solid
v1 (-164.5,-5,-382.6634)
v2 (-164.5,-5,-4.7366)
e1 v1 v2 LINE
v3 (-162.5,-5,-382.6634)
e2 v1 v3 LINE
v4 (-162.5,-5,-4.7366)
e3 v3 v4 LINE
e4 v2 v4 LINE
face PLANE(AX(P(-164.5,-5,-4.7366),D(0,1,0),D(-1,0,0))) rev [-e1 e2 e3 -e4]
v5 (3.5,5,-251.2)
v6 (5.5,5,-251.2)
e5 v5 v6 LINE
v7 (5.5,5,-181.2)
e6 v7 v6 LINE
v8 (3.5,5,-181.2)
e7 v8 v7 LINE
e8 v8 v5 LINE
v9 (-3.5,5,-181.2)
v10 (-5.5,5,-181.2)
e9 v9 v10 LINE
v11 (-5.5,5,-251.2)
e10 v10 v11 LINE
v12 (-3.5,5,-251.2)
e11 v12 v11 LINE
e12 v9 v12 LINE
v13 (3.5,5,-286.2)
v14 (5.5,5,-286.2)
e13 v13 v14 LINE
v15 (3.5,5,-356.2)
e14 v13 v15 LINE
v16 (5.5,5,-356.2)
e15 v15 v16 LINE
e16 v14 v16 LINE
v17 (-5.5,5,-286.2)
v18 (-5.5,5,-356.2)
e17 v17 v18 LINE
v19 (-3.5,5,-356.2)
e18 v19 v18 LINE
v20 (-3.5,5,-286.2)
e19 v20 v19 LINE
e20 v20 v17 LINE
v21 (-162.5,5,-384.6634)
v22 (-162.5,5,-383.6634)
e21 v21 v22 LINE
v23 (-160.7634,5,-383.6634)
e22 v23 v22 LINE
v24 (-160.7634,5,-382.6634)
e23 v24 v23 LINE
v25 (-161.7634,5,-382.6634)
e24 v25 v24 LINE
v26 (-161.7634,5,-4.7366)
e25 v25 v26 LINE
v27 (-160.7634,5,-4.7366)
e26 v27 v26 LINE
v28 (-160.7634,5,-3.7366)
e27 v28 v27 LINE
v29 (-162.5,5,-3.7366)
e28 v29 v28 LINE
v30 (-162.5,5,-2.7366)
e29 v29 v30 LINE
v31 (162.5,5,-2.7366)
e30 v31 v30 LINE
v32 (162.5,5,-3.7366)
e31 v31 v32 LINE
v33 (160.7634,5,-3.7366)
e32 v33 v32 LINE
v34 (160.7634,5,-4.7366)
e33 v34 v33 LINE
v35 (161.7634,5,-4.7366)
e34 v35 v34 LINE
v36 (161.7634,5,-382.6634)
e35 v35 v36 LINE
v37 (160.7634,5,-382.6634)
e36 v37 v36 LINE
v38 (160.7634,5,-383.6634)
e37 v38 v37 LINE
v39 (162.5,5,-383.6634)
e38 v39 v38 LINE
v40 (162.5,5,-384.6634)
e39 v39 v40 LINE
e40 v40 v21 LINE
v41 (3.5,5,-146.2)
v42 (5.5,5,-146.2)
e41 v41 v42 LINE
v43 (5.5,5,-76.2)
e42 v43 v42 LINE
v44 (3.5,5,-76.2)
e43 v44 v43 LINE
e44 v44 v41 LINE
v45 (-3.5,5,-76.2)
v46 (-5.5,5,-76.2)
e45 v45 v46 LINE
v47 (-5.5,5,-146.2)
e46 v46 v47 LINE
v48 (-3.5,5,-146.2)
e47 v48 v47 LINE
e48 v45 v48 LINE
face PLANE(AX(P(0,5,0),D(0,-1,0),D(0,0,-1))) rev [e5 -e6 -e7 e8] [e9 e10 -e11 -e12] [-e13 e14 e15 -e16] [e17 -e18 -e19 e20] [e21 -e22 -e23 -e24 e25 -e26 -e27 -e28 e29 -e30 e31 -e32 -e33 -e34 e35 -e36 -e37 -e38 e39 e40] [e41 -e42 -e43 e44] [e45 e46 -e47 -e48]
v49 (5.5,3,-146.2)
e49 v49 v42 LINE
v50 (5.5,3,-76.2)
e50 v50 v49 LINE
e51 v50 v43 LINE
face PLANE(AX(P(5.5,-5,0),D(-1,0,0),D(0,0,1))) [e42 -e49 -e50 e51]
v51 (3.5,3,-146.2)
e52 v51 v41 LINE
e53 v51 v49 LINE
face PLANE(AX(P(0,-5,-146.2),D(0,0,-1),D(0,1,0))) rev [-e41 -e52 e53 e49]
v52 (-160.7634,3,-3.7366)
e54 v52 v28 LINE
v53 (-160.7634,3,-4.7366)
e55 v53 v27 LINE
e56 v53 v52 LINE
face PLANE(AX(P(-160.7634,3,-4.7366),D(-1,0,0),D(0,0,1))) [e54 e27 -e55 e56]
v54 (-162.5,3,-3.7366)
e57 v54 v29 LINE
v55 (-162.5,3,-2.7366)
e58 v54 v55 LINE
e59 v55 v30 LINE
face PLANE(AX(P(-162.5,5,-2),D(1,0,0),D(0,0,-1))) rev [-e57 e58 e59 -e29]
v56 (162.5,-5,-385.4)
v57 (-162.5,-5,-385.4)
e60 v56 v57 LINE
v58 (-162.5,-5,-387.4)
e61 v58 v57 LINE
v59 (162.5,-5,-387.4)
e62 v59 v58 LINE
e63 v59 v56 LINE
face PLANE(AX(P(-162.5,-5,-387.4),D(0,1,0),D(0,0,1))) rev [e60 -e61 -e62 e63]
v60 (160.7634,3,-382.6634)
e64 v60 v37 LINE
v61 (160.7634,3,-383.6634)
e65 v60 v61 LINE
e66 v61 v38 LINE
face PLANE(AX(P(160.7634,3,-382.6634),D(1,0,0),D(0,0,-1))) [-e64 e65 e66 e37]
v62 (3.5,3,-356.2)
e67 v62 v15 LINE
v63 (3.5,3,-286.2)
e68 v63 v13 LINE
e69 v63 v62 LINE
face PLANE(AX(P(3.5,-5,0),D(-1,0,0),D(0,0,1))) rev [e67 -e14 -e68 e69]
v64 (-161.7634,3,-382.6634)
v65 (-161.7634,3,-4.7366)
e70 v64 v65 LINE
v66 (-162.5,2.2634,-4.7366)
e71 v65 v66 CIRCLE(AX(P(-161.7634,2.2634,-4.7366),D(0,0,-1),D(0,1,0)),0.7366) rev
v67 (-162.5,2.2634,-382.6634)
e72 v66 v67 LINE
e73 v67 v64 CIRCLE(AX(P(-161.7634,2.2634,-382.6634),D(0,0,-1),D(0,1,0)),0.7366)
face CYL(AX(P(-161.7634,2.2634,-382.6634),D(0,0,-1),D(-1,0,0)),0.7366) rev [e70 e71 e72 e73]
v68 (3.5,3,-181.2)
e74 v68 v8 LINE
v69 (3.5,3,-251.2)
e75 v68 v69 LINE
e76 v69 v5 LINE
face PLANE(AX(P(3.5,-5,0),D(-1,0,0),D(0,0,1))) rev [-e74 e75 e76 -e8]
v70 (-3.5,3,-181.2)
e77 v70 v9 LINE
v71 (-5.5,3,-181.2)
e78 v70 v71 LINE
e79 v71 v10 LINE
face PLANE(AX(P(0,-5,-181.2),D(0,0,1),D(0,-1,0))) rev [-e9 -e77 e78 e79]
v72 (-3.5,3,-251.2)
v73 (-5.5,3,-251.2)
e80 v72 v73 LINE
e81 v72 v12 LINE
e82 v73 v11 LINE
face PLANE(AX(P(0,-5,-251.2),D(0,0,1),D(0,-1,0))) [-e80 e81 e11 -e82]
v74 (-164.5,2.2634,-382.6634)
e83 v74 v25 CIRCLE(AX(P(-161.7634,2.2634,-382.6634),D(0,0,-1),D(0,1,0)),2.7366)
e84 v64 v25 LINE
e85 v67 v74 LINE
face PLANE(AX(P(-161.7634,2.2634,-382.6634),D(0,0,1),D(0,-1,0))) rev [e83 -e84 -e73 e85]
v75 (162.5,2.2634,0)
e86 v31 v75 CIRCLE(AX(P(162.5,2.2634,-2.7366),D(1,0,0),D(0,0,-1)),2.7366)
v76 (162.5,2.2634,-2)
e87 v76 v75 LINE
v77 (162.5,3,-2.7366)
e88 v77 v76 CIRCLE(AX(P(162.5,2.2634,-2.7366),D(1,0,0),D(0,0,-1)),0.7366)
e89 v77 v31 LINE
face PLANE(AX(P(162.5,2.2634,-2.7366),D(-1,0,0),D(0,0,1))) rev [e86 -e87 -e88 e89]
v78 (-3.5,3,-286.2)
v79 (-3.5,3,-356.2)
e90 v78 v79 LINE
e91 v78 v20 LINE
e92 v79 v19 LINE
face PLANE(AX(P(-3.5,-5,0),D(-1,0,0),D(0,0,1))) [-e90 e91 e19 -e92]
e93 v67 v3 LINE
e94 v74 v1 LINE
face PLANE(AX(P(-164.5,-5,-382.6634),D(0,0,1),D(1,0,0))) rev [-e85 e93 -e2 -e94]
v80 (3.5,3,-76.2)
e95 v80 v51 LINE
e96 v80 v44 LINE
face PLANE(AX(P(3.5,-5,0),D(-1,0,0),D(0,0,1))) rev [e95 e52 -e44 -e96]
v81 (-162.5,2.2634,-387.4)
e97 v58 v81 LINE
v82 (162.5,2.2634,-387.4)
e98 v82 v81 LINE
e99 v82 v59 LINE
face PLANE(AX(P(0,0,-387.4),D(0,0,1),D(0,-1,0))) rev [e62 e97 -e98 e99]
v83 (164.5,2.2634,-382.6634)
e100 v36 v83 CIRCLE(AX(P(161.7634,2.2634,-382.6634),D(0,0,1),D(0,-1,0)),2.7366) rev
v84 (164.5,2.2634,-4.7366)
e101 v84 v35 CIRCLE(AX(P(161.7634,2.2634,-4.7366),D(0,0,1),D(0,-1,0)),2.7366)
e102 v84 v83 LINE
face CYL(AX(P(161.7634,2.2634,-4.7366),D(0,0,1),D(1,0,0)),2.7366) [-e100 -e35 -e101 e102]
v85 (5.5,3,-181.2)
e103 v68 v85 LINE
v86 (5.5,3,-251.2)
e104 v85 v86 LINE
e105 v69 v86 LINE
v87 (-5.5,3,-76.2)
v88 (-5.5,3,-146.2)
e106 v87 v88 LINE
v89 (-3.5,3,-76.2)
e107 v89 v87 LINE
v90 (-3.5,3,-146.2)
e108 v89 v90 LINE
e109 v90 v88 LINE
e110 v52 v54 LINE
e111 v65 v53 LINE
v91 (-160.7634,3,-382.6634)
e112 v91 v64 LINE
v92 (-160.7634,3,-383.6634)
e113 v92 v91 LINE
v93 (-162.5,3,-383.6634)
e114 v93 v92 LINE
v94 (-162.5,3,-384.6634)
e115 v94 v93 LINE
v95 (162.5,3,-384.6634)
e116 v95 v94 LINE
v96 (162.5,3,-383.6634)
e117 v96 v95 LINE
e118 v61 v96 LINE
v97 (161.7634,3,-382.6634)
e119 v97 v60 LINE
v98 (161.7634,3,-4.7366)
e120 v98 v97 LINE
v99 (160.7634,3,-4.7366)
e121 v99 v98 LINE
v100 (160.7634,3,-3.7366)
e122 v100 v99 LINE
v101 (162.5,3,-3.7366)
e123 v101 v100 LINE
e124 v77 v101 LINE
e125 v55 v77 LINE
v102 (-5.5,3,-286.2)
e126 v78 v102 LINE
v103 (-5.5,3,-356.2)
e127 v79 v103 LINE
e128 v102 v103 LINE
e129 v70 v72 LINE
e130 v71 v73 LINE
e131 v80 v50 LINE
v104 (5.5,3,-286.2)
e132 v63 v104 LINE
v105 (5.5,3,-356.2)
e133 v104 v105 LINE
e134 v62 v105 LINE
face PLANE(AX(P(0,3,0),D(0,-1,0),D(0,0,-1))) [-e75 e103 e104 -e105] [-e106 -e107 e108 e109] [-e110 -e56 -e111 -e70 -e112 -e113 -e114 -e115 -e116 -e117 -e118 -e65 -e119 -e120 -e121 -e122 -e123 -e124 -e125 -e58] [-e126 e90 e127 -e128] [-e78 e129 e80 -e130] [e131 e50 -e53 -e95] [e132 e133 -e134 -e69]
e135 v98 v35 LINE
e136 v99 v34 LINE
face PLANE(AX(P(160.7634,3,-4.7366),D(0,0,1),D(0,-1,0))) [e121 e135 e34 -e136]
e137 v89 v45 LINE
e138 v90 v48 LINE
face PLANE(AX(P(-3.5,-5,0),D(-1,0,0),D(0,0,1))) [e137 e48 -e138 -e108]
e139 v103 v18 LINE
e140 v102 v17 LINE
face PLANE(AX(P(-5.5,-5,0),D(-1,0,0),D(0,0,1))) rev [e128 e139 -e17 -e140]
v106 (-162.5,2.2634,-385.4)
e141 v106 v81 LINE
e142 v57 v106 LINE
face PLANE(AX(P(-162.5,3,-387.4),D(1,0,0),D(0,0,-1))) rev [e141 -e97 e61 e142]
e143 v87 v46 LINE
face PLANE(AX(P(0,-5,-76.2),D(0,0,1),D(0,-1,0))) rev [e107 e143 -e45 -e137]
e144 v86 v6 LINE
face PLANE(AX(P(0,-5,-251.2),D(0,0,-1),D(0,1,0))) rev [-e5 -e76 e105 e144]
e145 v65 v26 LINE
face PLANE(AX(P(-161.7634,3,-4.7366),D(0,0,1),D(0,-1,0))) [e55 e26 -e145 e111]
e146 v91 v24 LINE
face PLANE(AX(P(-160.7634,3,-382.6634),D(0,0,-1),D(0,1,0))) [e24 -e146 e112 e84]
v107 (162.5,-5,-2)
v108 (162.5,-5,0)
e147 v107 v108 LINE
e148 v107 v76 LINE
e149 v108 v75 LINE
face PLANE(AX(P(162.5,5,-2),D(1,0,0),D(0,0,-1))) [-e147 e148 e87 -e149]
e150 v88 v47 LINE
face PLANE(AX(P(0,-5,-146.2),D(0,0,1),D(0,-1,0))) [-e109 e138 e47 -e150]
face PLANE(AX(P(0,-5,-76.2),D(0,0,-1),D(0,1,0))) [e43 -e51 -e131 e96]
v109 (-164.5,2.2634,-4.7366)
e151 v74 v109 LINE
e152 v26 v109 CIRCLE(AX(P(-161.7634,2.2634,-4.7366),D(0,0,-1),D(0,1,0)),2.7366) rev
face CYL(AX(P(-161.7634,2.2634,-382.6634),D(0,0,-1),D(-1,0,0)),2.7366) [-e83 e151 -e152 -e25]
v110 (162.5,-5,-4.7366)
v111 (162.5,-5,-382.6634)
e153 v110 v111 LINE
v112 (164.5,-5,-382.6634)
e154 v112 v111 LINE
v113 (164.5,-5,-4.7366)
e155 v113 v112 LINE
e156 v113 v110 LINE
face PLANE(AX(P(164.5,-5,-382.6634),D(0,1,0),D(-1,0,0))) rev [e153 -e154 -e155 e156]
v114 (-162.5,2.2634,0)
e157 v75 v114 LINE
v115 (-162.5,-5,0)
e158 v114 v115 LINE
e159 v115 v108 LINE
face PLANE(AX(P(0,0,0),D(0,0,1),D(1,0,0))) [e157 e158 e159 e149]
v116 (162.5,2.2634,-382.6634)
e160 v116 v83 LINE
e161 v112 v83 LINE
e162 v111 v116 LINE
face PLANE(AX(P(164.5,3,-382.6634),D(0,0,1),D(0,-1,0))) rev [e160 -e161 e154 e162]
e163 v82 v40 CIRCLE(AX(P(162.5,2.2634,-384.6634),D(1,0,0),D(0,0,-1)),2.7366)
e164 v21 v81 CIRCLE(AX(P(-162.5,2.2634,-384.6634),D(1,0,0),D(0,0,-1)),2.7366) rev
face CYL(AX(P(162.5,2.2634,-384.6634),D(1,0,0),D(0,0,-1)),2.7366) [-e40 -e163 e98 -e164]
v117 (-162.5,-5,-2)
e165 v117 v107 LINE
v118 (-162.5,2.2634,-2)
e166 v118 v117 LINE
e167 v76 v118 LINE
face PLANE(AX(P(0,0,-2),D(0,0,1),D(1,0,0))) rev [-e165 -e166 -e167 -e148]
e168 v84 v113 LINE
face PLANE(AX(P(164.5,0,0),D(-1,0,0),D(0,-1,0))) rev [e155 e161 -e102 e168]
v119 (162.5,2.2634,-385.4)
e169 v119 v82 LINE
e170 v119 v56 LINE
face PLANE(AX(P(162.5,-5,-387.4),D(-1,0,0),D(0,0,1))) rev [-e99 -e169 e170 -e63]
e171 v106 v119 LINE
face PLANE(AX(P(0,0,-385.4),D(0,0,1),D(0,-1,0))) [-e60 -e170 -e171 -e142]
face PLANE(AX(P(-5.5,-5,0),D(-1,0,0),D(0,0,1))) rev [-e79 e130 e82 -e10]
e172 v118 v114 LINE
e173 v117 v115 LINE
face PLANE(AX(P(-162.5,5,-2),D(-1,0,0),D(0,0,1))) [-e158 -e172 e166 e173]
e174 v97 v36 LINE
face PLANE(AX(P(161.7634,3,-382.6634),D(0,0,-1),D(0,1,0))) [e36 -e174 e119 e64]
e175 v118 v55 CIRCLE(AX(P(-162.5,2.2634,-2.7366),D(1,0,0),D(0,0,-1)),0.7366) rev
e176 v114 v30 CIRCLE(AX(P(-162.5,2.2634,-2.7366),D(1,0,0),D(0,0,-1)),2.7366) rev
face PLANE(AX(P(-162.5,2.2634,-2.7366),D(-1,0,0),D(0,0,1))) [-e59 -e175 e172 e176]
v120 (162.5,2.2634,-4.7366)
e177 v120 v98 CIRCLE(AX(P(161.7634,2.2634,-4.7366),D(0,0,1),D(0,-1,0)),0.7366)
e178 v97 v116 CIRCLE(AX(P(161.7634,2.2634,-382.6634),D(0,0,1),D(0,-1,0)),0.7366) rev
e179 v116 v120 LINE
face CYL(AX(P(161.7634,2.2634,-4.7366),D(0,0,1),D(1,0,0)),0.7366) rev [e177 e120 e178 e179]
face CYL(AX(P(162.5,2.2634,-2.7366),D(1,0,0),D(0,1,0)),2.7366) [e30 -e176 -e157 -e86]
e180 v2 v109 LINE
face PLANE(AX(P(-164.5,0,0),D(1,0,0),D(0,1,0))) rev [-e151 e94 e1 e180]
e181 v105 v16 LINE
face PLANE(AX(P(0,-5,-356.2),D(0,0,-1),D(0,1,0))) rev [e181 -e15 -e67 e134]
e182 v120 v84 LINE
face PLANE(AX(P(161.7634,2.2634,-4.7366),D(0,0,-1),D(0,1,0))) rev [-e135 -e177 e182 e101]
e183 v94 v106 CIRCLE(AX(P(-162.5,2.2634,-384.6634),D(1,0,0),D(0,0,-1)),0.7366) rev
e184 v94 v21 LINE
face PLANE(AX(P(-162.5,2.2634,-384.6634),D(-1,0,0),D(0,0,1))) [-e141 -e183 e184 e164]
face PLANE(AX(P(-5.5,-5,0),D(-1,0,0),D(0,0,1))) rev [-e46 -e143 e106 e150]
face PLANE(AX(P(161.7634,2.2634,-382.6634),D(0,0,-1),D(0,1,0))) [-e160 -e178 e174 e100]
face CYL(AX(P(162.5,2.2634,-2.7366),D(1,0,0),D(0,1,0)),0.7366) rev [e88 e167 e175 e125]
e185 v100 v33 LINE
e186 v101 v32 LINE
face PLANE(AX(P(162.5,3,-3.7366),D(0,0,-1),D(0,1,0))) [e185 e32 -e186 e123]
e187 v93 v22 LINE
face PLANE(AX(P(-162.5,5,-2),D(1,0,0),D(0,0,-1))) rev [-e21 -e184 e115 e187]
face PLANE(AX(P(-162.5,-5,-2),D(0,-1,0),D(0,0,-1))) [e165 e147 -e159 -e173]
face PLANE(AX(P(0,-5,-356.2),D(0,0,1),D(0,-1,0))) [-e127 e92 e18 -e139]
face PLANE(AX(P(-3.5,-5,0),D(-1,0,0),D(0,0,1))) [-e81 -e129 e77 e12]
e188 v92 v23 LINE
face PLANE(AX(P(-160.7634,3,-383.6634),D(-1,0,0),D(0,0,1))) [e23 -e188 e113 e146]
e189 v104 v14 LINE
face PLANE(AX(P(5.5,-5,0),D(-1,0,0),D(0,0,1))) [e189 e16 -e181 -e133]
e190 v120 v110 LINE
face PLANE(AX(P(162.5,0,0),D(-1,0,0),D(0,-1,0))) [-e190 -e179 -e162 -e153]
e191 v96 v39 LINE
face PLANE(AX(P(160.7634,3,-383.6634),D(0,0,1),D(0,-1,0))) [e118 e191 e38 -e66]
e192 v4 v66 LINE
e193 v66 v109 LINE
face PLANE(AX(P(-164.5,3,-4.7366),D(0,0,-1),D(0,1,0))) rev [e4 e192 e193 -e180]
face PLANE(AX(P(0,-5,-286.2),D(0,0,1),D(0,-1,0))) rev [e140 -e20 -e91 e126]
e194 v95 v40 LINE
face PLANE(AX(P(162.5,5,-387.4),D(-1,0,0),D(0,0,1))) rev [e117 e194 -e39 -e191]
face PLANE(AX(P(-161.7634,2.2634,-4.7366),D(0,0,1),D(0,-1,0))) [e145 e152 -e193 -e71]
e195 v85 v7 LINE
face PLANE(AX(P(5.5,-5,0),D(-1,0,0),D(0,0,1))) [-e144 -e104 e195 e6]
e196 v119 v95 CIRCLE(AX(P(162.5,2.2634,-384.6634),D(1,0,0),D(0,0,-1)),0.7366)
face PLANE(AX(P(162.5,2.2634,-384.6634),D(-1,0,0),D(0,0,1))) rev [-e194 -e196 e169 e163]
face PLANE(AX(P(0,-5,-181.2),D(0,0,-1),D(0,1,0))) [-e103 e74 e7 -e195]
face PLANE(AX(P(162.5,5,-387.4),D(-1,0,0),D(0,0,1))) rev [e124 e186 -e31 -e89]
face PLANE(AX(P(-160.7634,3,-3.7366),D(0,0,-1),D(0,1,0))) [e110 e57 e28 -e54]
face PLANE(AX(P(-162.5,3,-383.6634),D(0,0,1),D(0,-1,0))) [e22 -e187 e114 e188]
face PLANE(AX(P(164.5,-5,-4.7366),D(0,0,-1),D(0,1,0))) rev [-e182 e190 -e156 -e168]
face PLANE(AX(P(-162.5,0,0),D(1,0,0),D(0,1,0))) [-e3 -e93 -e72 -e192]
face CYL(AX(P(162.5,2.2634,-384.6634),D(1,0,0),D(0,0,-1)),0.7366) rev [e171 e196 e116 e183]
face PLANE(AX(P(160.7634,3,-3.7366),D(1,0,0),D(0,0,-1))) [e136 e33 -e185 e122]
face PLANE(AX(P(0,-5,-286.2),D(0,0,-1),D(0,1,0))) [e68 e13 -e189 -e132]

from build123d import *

# Parameters (mm, degrees)
SKETCH1_W                     = 325
SKETCH1_H                     = 10
BASE_FLANGE1_DEPTH            = 2
EDGE_FLANGE1_STRIP_W          = 9.4732
EDGE_FLANGE1_STRIP_H          = 2
EDGE_FLANGE1_STRIP_CUT_DEPTH  = 325
EDGE_FLANGE1_DEPTH            = 325
EDGE_FLANGE2_STRIP_W          = 9.4732
EDGE_FLANGE2_STRIP_H          = 2
EDGE_FLANGE2_STRIP_CUT_DEPTH  = 325
EDGE_FLANGE2_DEPTH            = 325
EDGE_FLANGE3_STRIP_W          = 9.4732
EDGE_FLANGE3_STRIP_H          = 2
EDGE_FLANGE3_STRIP_CUT_DEPTH  = 377.9268
EDGE_FLANGE3_RELIEF_W         = 10.4732
EDGE_FLANGE3_RELIEF_H         = 1
EDGE_FLANGE3_RELIEF_CUT_DEPTH = 2
EDGE_FLANGE3_DEPTH            = 377.9268
EDGE_FLANGE4_STRIP_W          = 9.4732
EDGE_FLANGE4_STRIP_H          = 2
EDGE_FLANGE4_STRIP_CUT_DEPTH  = 377.9268
EDGE_FLANGE4_RELIEF_W         = 10.4732
EDGE_FLANGE4_RELIEF_H         = 1
EDGE_FLANGE4_RELIEF_CUT_DEPTH = 2
EDGE_FLANGE4_DEPTH            = 377.9268
CUT_EXTRUDE1_DEPTH            = 421.997636573
CUT_EXTRUDE1_DEPTH_BACK       = 421.997636573
SKETCH14_W                    = 2
SKETCH14_H                    = 70


# Sheet-metal steps are written as plain solids
with BuildPart() as part:
    # Sketch1 → Base-Flange1 (new body)
    with BuildSketch(Plane.XY):
        Rectangle(SKETCH1_W, SKETCH1_H)
    extrude(amount=-BASE_FLANGE1_DEPTH)

    # Edge-Flange1 strip (across the edge) → Edge-Flange1 strip cut (cut)
    with BuildSketch(Plane(origin=(-162.5, 5, -2), x_dir=(0, -1, 0), z_dir=(1, 0, 0))):
        with Locations((-2, -1)):
            Rectangle(EDGE_FLANGE1_STRIP_W, EDGE_FLANGE1_STRIP_H)
    extrude(amount=EDGE_FLANGE1_STRIP_CUT_DEPTH, mode=Mode.SUBTRACT)

    # Edge-Flange1 section (across the edge) → Edge-Flange1 (add)
    with BuildSketch(Plane(origin=(-162.5, 5, -2), x_dir=(0, -1, 0), z_dir=(1, 0, 0))):
        with BuildLine():
            Line((0, 0.7366), (0, 385.4))
            Line((0, 385.4), (2, 385.4))
            Line((2, 385.4), (2, 0.7366))
            ThreePointArc((2, 0.7366), (2.215745145, 0.215745145), (2.7366, 0))
            Line((2.7366, 0), (2.7366, -2))
            ThreePointArc((2.7366, -2), (0.801531583, -1.198468417), (0, 0.7366))
        make_face()
    extrude(amount=EDGE_FLANGE1_DEPTH)

    # Edge-Flange2 strip (across the edge) → Edge-Flange2 strip cut (cut)
    with BuildSketch(Plane(origin=(-162.5, 3, -387.4), x_dir=(0, 0, 1), z_dir=(1, 0, 0))):
        with Locations((-2, -1)):
            Rectangle(EDGE_FLANGE2_STRIP_W, EDGE_FLANGE2_STRIP_H)
    extrude(amount=EDGE_FLANGE2_STRIP_CUT_DEPTH, mode=Mode.SUBTRACT)

    # Edge-Flange2 section (across the edge) → Edge-Flange2 (add)
    with BuildSketch(Plane(origin=(-162.5, 3, -387.4), x_dir=(0, 0, 1), z_dir=(1, 0, 0))):
        with BuildLine():
            Line((0, 0.7366), (0, 8))
            Line((0, 8), (2, 8))
            Line((2, 8), (2, 0.7366))
            ThreePointArc((2, 0.7366), (2.215745145, 0.215745145), (2.7366, 0))
            Line((2.7366, 0), (2.7366, -2))
            ThreePointArc((2.7366, -2), (0.801531583, -1.198468417), (0, 0.7366))
        make_face()
    extrude(amount=EDGE_FLANGE2_DEPTH)

    # Edge-Flange3 strip (across the edge) → Edge-Flange3 strip cut (cut)
    with BuildSketch(Plane(origin=(162.5, 3, -382.6634), x_dir=(-1, 0, 0), z_dir=(0, 0, 1))):
        with Locations((-4, -1)):
            Rectangle(EDGE_FLANGE3_STRIP_W, EDGE_FLANGE3_STRIP_H)
    extrude(amount=EDGE_FLANGE3_STRIP_CUT_DEPTH, mode=Mode.SUBTRACT)

    # Edge-Flange3 relief (on the sheet) → Edge-Flange3 relief cut (cut)
    with BuildSketch(Plane(origin=(161.7634, 3, -382.6634), x_dir=(-1, 0, 0), z_dir=(0, -1, 0))):
        with Locations((-4.2366, 0.5)):
            Rectangle(EDGE_FLANGE3_RELIEF_W, EDGE_FLANGE3_RELIEF_H)
        with Locations((-4.2366, -378.4268)):
            Rectangle(EDGE_FLANGE3_RELIEF_W, EDGE_FLANGE3_RELIEF_H)
    extrude(amount=-EDGE_FLANGE3_RELIEF_CUT_DEPTH, mode=Mode.SUBTRACT)

    # Edge-Flange3 section (across the edge) → Edge-Flange3 (add)
    with BuildSketch(Plane(origin=(162.5, 3, -382.6634), x_dir=(-1, 0, 0), z_dir=(0, 0, 1))):
        with BuildLine():
            Line((-2, 0.7366), (-2, 8))
            Line((-2, 8), (0, 8))
            Line((0, 8), (0, 0.7366))
            ThreePointArc((0, 0.7366), (0.215745145, 0.215745145), (0.7366, 0))
            Line((0.7366, 0), (0.7366, -2))
            ThreePointArc((0.7366, -2), (-1.198468417, -1.198468417), (-2, 0.7366))
        make_face()
    extrude(amount=EDGE_FLANGE3_DEPTH)

    # Edge-Flange4 strip (across the edge) → Edge-Flange4 strip cut (cut)
    with BuildSketch(Plane(origin=(-162.5, 3, -4.7366), x_dir=(1, 0, 0), z_dir=(0, 0, -1))):
        with Locations((-4, -1)):
            Rectangle(EDGE_FLANGE4_STRIP_W, EDGE_FLANGE4_STRIP_H)
    extrude(amount=EDGE_FLANGE4_STRIP_CUT_DEPTH, mode=Mode.SUBTRACT)

    # Edge-Flange4 relief (on the sheet) → Edge-Flange4 relief cut (cut)
    with BuildSketch(Plane(origin=(-161.7634, 3, -4.7366), x_dir=(1, 0, 0), z_dir=(0, -1, 0))):
        with Locations((-4.2366, 0.5)):
            Rectangle(EDGE_FLANGE4_RELIEF_W, EDGE_FLANGE4_RELIEF_H)
        with Locations((-4.2366, -378.4268)):
            Rectangle(EDGE_FLANGE4_RELIEF_W, EDGE_FLANGE4_RELIEF_H)
    extrude(amount=-EDGE_FLANGE4_RELIEF_CUT_DEPTH, mode=Mode.SUBTRACT)

    # Edge-Flange4 section (across the edge) → Edge-Flange4 (add)
    with BuildSketch(Plane(origin=(-162.5, 3, -4.7366), x_dir=(1, 0, 0), z_dir=(0, 0, -1))):
        with BuildLine():
            Line((-2, 0.7366), (-2, 8))
            Line((-2, 8), (0, 8))
            Line((0, 8), (0, 0.7366))
            ThreePointArc((0, 0.7366), (0.215745145, 0.215745145), (0.7366, 0))
            Line((0.7366, 0), (0.7366, -2))
            ThreePointArc((0.7366, -2), (-1.198468417, -1.198468417), (-2, 0.7366))
        make_face()
    extrude(amount=EDGE_FLANGE4_DEPTH)

    # Sketch14 → Cut-Extrude1 (cut, two sides: drawn at the far end of the back side and taken through both)
    with BuildSketch(Plane(origin=(0, 5, 0), x_dir=(1, 0, 0), z_dir=(0, 1, 0)).offset(-CUT_EXTRUDE1_DEPTH_BACK)):
        with Locations((-4.5, 321.2)):
            Rectangle(SKETCH14_W, SKETCH14_H)
        with Locations((4.5, 321.2)):
            Rectangle(SKETCH14_W, SKETCH14_H)
        with Locations((-4.5, 216.2)):
            Rectangle(SKETCH14_W, SKETCH14_H)
        with Locations((4.5, 216.2)):
            Rectangle(SKETCH14_W, SKETCH14_H)
        with Locations((-4.5, 111.2)):
            Rectangle(SKETCH14_W, SKETCH14_H)
        with Locations((4.5, 111.2)):
            Rectangle(SKETCH14_W, SKETCH14_H)
    extrude(amount=CUT_EXTRUDE1_DEPTH + CUT_EXTRUDE1_DEPTH_BACK, mode=Mode.SUBTRACT)


solid = part.part
